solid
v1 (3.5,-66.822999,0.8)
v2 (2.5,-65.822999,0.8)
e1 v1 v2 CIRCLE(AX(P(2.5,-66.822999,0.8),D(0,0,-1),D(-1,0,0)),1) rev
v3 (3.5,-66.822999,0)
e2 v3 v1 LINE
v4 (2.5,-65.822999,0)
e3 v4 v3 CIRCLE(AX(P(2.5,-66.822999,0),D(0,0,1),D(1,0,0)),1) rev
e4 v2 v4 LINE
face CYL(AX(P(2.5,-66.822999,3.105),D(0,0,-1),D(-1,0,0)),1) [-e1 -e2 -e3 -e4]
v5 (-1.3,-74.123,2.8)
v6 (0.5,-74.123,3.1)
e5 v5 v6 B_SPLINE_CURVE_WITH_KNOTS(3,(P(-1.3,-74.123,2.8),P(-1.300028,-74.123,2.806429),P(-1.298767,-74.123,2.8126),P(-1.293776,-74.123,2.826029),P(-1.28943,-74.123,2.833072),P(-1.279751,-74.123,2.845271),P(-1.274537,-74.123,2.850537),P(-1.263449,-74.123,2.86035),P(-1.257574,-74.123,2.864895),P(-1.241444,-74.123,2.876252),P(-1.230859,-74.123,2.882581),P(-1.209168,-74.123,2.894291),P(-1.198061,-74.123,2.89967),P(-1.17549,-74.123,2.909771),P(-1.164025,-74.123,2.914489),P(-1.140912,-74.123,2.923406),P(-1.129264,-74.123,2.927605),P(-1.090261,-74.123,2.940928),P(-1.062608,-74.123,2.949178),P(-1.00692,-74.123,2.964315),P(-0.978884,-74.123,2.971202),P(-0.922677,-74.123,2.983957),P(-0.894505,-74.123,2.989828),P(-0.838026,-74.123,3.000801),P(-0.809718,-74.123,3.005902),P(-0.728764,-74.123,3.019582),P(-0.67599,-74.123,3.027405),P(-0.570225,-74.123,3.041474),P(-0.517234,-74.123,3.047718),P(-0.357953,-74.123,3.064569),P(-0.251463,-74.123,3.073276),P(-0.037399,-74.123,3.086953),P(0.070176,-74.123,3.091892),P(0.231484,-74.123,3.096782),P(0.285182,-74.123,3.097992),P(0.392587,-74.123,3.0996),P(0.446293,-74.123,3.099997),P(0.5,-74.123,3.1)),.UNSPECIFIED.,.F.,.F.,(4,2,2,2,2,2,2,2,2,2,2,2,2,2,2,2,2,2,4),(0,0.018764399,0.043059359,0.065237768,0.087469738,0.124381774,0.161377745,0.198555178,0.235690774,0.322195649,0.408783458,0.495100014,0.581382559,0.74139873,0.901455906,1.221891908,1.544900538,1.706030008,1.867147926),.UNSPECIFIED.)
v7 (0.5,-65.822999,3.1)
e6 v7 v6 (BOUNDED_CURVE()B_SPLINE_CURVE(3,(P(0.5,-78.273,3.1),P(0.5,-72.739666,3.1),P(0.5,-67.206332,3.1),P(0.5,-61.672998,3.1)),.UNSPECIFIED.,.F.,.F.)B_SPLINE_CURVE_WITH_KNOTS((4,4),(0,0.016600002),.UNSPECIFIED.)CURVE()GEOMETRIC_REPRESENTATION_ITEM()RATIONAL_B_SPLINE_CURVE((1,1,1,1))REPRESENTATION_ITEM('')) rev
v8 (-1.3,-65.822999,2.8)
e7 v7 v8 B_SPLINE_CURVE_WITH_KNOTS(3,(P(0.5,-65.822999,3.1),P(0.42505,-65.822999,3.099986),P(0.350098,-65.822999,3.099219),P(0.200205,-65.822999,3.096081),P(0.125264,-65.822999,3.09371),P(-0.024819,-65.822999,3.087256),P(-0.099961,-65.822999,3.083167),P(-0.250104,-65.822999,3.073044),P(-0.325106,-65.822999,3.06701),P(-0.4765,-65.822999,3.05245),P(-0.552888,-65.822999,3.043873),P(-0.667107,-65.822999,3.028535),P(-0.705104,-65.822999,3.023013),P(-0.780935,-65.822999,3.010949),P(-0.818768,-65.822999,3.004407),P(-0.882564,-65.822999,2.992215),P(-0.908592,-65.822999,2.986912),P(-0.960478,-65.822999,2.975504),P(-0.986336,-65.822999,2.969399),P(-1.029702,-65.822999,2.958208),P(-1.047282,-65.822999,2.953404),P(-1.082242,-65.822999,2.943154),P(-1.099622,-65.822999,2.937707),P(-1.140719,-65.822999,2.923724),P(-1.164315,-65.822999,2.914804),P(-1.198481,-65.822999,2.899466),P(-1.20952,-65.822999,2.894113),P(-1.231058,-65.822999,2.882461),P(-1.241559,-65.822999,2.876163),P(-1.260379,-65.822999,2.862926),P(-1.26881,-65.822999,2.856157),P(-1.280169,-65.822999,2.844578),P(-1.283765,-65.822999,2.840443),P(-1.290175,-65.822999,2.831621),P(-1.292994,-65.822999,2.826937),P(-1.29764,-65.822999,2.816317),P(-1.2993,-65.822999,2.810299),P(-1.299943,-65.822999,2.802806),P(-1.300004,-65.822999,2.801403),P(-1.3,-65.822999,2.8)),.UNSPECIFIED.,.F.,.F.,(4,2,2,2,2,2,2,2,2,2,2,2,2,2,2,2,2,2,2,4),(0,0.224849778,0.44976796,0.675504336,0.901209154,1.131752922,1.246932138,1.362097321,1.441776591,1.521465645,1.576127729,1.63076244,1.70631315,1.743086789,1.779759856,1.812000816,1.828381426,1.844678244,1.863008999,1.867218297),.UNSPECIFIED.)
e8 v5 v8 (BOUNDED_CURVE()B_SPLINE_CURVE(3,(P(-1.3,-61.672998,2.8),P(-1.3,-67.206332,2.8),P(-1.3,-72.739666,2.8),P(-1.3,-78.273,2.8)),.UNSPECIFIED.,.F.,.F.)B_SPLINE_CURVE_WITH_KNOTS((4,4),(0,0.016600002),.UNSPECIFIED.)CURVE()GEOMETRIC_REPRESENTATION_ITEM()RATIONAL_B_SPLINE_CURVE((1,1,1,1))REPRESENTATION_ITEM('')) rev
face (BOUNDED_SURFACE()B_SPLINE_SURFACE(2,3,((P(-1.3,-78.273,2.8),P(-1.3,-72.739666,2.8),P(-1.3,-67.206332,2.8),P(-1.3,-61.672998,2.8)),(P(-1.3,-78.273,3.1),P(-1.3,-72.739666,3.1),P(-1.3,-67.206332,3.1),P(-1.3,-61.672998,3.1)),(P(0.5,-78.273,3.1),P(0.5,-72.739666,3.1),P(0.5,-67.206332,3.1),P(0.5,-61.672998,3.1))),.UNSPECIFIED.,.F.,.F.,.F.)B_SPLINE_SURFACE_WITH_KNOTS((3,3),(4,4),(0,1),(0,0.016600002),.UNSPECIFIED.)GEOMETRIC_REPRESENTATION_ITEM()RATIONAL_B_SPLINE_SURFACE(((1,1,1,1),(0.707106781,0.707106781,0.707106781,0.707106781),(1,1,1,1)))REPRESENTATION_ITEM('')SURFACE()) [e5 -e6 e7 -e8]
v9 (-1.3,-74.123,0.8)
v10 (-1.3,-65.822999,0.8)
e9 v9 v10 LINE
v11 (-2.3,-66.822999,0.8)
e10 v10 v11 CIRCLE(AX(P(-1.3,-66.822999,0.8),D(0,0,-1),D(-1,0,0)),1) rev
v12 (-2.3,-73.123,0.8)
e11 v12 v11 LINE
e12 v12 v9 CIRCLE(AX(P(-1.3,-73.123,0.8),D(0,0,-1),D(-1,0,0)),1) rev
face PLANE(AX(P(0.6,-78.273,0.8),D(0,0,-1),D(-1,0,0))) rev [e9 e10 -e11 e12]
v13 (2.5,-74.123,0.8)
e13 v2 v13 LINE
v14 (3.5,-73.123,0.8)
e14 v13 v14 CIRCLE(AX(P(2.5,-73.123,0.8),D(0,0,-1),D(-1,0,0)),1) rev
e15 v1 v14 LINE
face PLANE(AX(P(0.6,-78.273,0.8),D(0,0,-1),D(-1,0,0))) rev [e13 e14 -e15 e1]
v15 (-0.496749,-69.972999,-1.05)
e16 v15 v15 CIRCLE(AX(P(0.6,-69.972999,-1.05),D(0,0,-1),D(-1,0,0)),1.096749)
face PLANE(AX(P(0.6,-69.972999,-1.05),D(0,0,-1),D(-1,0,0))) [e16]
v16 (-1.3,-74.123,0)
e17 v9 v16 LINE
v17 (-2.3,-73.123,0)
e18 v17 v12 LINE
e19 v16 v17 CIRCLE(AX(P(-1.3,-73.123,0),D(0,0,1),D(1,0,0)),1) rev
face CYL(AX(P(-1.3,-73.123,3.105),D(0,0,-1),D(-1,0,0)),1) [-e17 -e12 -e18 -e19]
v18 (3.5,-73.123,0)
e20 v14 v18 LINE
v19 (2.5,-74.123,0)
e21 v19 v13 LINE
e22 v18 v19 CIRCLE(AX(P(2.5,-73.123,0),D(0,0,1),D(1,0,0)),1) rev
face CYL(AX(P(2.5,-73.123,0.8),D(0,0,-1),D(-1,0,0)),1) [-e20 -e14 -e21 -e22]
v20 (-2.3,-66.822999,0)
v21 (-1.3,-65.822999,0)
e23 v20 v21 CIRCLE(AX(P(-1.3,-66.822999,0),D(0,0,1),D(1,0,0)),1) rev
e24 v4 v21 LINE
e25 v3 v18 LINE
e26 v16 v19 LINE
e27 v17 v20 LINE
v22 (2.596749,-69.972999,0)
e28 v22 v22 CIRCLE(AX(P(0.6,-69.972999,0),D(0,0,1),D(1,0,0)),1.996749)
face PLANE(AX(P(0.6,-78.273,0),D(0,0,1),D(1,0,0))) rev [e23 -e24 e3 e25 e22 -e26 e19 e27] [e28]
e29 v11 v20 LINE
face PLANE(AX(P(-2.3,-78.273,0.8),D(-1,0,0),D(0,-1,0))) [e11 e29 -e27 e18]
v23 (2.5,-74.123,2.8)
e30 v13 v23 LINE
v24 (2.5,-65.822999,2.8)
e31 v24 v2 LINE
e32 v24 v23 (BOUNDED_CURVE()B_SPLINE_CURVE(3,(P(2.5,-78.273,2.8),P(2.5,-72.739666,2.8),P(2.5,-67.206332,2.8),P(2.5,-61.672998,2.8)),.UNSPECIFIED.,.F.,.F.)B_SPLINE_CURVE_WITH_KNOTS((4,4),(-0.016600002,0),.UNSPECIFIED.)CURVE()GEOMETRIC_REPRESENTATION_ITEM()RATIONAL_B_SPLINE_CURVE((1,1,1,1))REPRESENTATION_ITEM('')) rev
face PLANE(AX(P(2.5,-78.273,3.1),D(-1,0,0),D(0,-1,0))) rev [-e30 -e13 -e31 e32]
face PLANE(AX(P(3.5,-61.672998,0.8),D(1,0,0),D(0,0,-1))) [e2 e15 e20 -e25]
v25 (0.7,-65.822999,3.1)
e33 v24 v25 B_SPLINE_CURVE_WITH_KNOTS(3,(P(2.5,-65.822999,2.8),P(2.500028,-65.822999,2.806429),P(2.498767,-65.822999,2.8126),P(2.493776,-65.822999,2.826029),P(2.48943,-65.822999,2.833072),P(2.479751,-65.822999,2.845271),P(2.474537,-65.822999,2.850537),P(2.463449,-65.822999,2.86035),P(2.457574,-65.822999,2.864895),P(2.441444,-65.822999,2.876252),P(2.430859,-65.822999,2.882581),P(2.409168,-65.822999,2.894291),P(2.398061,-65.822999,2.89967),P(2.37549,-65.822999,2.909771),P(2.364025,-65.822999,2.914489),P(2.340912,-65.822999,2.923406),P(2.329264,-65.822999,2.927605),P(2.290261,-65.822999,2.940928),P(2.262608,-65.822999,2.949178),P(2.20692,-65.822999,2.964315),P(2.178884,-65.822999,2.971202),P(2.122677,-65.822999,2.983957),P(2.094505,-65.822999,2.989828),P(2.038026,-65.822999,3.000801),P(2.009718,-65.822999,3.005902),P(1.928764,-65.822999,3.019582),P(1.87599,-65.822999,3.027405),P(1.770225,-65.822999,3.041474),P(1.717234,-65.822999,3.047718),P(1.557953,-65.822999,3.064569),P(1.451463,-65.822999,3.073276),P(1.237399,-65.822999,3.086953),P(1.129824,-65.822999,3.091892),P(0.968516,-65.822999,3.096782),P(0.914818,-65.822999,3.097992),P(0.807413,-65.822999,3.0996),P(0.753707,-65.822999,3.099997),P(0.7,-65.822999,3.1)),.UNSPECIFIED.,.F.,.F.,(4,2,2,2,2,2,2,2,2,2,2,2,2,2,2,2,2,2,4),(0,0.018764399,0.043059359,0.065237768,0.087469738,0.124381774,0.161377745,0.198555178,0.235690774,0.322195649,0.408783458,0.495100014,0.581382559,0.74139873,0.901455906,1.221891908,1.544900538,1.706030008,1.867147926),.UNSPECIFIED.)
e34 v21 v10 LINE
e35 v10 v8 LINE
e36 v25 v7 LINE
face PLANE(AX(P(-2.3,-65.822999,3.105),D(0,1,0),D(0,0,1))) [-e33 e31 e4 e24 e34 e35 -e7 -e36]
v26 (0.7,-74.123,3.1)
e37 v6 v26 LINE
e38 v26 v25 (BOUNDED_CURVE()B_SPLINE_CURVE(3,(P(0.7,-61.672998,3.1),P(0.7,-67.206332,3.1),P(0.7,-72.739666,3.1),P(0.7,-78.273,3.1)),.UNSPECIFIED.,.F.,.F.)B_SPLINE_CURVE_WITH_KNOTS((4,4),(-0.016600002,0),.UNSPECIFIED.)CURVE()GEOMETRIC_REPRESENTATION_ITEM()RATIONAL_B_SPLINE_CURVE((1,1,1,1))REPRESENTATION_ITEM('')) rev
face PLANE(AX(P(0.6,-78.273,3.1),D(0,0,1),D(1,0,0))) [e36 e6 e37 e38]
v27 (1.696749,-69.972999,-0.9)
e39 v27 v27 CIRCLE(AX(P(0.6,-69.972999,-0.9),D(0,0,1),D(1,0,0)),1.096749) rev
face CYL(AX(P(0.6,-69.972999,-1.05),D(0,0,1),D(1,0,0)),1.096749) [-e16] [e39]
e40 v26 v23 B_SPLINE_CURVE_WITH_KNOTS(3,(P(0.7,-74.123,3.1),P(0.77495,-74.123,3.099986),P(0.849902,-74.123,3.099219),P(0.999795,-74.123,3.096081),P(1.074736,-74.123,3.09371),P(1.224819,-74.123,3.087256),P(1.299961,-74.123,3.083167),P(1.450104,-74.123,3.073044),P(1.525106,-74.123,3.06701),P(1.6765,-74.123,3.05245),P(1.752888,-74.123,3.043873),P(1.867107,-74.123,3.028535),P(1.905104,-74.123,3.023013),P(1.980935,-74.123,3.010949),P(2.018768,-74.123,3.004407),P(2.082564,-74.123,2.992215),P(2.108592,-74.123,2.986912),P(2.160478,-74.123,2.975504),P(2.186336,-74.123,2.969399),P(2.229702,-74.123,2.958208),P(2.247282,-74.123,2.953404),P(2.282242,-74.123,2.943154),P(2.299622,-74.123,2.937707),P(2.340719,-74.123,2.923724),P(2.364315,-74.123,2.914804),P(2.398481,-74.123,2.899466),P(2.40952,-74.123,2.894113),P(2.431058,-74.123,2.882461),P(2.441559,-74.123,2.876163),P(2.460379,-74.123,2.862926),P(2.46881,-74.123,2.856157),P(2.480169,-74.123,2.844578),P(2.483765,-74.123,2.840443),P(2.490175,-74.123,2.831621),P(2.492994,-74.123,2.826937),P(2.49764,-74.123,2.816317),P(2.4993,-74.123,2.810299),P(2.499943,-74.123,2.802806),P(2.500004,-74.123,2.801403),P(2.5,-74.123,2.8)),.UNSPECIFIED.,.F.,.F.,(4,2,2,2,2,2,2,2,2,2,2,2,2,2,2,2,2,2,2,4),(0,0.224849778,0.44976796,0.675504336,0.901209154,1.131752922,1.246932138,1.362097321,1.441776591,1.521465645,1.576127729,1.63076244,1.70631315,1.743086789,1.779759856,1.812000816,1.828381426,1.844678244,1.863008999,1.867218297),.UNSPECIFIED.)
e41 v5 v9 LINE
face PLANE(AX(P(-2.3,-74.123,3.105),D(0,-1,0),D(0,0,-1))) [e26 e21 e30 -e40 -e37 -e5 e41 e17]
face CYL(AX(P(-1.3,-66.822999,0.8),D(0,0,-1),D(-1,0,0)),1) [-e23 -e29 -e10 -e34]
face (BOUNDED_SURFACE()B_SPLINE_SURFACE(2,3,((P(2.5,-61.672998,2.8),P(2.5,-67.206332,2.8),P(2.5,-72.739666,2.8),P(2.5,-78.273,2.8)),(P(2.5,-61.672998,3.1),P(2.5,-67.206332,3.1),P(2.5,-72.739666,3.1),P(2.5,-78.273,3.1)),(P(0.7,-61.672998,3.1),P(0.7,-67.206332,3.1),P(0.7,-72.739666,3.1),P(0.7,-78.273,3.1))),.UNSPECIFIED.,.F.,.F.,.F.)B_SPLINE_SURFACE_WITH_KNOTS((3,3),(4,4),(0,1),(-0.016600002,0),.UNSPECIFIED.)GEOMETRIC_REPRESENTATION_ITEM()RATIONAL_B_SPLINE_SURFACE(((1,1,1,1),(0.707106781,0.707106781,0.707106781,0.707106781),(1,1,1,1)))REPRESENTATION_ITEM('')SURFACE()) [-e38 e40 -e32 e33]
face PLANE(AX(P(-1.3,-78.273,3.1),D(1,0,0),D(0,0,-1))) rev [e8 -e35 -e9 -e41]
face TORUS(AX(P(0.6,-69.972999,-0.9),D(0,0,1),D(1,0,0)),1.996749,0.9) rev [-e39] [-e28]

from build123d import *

# Parameters (mm, degrees)
EXTRUDE_1_DEPTH          = 3.1
EXTRUDE_2_DEPTH          = 0.8
FILLET_1_SIZE            = 0.3
FILLET_1_SIZE_2          = 1.8
SKETCH_3_R               = 1
SKETCH_3_R_2             = 1.096749421
EXTRUDE_3_DEPTH          = 1.05
FILLET_5_R               = 0.9
CUT_EXTRUDE_2_DEPTH      = 82.307539193
CUT_EXTRUDE_2_DEPTH_BACK = 82.307539193
SKETCH_7_W               = 25.8
SKETCH_7_H               = 28.300000874
SKETCH_7_W_2             = 5.8
SKETCH_7_H_2             = 8.300000874
FILLET_6_R               = 1


with BuildPart() as part:
    # 草图1 → 凸台-拉伸1 (new body)
    with BuildSketch(Plane.XY):
        with BuildLine():
            Line((-1.3, -78.273), (-1.3, -61.672998253))
            ThreePointArc((-1.3, -61.672998253), (0.6, -59.772998253), (2.5, -61.672998253))
            Line((2.5, -61.672998253), (2.5, -78.273))
            ThreePointArc((2.5, -78.273), (0.6, -80.173), (-1.3, -78.273))
        make_face()
    extrude(amount=EXTRUDE_1_DEPTH)

    # 草图2 → 凸台-拉伸2 (add)
    with BuildSketch(Plane(origin=(0, 0, 0), x_dir=(-1, 0, 0), z_dir=(0, 0, -1))):
        with BuildLine():
            Line((2.3, -78.273), (2.3, -61.672998253))
            ThreePointArc((2.3, -61.672998253), (-0.6, -58.772998253), (-3.5, -61.672998253))
            Line((-3.5, -61.672998253), (-3.5, -78.273))
            ThreePointArc((-3.5, -78.273), (-0.6, -81.173), (2.3, -78.273))
        make_face()
    extrude(amount=-EXTRUDE_2_DEPTH)

    # 圆角1
    # an asymmetric fillet: 1.8, 0.3 mm, written as the material it takes off along each edge
    with BuildSketch(Plane(origin=(2.5, -61.672998253, 3.1), x_dir=(0, 0, -1), z_dir=(0, -1, 0)), Plane(origin=(-1.3, -78.273, 3.1), x_dir=(0, 0, -1), z_dir=(0, 1, 0))) as fillet_1_piece_1:
        with BuildLine():
            Bezier((FILLET_1_SIZE, 0), (0, 0), (0, -FILLET_1_SIZE_2), weights=[1, 0.707106781, 1])
            Line((0, -FILLET_1_SIZE_2), (0, 0))
            Line((0, 0), (FILLET_1_SIZE, 0))
        make_face()
    extrude(amount=16.600001747, mode=Mode.SUBTRACT)
    with BuildSketch(Plane(origin=(0.6, -61.672998253, 3.1), x_dir=(-1, 0, 0), z_dir=(0, -1, 0))) as fillet_1_piece_2:
        with BuildLine():
            Bezier((1.9, FILLET_1_SIZE), (1.9, 0), (1.9 - FILLET_1_SIZE_2, 0), weights=[1, 0.707106781, 1])
            Line((1.9 - FILLET_1_SIZE_2, 0), (1.9, 0))
            Line((1.9, 0), (1.9, FILLET_1_SIZE))
        make_face()
    revolve(axis=Axis((0.6, -61.672998253, 3.1), (0, 0, -1)), revolution_arc=180, mode=Mode.SUBTRACT)
    with BuildSketch(Plane(origin=(0.6, -78.273, 3.1), x_dir=(1, 0, 0), z_dir=(0, 1, 0))) as fillet_1_piece_3:
        with BuildLine():
            Bezier((1.9, FILLET_1_SIZE), (1.9, 0), (1.9 - FILLET_1_SIZE_2, 0), weights=[1, 0.707106781, 1])
            Line((1.9 - FILLET_1_SIZE_2, 0), (1.9, 0))
            Line((1.9, 0), (1.9, FILLET_1_SIZE))
        make_face()
    revolve(axis=Axis((0.6, -78.273, 3.1), (0, 0, -1)), revolution_arc=180, mode=Mode.SUBTRACT)

    # 草图3 → 凸台-拉伸3 (add)
    with BuildSketch(Plane(origin=(0, 0, 0), x_dir=(-1, 0, 0), z_dir=(0, 0, -1))):
        with Locations(Location((-0.6, -61.672998253, 0), (0, 0, 180))):
            Circle(SKETCH_3_R)
        with Locations(Location((-0.6, -69.972999126, 0), (0, 0, 180))):
            Circle(SKETCH_3_R_2)
        with Locations(Location((-0.6, -78.273, 0), (0, 0, 180))):
            Circle(SKETCH_3_R_2)
    extrude(amount=EXTRUDE_3_DEPTH)

    # 圆角5
    fillet_5_edges = [part.edges().sort_by_distance(p)[0] for p in [
        (-0.4, -61.672998253, 0),
        (-0.496749421, -69.972999126, 0),
        (-0.496749421, -78.273, 0),
    ]]
    fillet(fillet_5_edges, radius=FILLET_5_R)

    # 草图7 → 切除-拉伸2 (cut, two sides: drawn at the far end of the back side and taken through both)
    with BuildSketch(Plane(origin=(0, 0, 0), x_dir=(-1, 0, 0), z_dir=(0, 0, -1)).offset(-CUT_EXTRUDE_2_DEPTH_BACK)):
        with Locations((-0.6, -69.972999126)):
            Rectangle(SKETCH_7_W, SKETCH_7_H)
        with Locations((-0.6, -69.972999126)):
            Rectangle(SKETCH_7_W_2, SKETCH_7_H_2, mode=Mode.SUBTRACT)
    extrude(amount=CUT_EXTRUDE_2_DEPTH + CUT_EXTRUDE_2_DEPTH_BACK, mode=Mode.SUBTRACT)

    # 圆角6
    fillet_6_edges = [part.edges().sort_by_distance(p)[0] for p in [
        (3.5, -74.122999563, 0.4),
        (3.5, -65.822998689, 0.4),
        (-2.3, -65.822998689, 0.4),
        (-2.3, -74.122999563, 0.4),
    ]]
    fillet(fillet_6_edges, radius=FILLET_6_R)


solid = part.part
